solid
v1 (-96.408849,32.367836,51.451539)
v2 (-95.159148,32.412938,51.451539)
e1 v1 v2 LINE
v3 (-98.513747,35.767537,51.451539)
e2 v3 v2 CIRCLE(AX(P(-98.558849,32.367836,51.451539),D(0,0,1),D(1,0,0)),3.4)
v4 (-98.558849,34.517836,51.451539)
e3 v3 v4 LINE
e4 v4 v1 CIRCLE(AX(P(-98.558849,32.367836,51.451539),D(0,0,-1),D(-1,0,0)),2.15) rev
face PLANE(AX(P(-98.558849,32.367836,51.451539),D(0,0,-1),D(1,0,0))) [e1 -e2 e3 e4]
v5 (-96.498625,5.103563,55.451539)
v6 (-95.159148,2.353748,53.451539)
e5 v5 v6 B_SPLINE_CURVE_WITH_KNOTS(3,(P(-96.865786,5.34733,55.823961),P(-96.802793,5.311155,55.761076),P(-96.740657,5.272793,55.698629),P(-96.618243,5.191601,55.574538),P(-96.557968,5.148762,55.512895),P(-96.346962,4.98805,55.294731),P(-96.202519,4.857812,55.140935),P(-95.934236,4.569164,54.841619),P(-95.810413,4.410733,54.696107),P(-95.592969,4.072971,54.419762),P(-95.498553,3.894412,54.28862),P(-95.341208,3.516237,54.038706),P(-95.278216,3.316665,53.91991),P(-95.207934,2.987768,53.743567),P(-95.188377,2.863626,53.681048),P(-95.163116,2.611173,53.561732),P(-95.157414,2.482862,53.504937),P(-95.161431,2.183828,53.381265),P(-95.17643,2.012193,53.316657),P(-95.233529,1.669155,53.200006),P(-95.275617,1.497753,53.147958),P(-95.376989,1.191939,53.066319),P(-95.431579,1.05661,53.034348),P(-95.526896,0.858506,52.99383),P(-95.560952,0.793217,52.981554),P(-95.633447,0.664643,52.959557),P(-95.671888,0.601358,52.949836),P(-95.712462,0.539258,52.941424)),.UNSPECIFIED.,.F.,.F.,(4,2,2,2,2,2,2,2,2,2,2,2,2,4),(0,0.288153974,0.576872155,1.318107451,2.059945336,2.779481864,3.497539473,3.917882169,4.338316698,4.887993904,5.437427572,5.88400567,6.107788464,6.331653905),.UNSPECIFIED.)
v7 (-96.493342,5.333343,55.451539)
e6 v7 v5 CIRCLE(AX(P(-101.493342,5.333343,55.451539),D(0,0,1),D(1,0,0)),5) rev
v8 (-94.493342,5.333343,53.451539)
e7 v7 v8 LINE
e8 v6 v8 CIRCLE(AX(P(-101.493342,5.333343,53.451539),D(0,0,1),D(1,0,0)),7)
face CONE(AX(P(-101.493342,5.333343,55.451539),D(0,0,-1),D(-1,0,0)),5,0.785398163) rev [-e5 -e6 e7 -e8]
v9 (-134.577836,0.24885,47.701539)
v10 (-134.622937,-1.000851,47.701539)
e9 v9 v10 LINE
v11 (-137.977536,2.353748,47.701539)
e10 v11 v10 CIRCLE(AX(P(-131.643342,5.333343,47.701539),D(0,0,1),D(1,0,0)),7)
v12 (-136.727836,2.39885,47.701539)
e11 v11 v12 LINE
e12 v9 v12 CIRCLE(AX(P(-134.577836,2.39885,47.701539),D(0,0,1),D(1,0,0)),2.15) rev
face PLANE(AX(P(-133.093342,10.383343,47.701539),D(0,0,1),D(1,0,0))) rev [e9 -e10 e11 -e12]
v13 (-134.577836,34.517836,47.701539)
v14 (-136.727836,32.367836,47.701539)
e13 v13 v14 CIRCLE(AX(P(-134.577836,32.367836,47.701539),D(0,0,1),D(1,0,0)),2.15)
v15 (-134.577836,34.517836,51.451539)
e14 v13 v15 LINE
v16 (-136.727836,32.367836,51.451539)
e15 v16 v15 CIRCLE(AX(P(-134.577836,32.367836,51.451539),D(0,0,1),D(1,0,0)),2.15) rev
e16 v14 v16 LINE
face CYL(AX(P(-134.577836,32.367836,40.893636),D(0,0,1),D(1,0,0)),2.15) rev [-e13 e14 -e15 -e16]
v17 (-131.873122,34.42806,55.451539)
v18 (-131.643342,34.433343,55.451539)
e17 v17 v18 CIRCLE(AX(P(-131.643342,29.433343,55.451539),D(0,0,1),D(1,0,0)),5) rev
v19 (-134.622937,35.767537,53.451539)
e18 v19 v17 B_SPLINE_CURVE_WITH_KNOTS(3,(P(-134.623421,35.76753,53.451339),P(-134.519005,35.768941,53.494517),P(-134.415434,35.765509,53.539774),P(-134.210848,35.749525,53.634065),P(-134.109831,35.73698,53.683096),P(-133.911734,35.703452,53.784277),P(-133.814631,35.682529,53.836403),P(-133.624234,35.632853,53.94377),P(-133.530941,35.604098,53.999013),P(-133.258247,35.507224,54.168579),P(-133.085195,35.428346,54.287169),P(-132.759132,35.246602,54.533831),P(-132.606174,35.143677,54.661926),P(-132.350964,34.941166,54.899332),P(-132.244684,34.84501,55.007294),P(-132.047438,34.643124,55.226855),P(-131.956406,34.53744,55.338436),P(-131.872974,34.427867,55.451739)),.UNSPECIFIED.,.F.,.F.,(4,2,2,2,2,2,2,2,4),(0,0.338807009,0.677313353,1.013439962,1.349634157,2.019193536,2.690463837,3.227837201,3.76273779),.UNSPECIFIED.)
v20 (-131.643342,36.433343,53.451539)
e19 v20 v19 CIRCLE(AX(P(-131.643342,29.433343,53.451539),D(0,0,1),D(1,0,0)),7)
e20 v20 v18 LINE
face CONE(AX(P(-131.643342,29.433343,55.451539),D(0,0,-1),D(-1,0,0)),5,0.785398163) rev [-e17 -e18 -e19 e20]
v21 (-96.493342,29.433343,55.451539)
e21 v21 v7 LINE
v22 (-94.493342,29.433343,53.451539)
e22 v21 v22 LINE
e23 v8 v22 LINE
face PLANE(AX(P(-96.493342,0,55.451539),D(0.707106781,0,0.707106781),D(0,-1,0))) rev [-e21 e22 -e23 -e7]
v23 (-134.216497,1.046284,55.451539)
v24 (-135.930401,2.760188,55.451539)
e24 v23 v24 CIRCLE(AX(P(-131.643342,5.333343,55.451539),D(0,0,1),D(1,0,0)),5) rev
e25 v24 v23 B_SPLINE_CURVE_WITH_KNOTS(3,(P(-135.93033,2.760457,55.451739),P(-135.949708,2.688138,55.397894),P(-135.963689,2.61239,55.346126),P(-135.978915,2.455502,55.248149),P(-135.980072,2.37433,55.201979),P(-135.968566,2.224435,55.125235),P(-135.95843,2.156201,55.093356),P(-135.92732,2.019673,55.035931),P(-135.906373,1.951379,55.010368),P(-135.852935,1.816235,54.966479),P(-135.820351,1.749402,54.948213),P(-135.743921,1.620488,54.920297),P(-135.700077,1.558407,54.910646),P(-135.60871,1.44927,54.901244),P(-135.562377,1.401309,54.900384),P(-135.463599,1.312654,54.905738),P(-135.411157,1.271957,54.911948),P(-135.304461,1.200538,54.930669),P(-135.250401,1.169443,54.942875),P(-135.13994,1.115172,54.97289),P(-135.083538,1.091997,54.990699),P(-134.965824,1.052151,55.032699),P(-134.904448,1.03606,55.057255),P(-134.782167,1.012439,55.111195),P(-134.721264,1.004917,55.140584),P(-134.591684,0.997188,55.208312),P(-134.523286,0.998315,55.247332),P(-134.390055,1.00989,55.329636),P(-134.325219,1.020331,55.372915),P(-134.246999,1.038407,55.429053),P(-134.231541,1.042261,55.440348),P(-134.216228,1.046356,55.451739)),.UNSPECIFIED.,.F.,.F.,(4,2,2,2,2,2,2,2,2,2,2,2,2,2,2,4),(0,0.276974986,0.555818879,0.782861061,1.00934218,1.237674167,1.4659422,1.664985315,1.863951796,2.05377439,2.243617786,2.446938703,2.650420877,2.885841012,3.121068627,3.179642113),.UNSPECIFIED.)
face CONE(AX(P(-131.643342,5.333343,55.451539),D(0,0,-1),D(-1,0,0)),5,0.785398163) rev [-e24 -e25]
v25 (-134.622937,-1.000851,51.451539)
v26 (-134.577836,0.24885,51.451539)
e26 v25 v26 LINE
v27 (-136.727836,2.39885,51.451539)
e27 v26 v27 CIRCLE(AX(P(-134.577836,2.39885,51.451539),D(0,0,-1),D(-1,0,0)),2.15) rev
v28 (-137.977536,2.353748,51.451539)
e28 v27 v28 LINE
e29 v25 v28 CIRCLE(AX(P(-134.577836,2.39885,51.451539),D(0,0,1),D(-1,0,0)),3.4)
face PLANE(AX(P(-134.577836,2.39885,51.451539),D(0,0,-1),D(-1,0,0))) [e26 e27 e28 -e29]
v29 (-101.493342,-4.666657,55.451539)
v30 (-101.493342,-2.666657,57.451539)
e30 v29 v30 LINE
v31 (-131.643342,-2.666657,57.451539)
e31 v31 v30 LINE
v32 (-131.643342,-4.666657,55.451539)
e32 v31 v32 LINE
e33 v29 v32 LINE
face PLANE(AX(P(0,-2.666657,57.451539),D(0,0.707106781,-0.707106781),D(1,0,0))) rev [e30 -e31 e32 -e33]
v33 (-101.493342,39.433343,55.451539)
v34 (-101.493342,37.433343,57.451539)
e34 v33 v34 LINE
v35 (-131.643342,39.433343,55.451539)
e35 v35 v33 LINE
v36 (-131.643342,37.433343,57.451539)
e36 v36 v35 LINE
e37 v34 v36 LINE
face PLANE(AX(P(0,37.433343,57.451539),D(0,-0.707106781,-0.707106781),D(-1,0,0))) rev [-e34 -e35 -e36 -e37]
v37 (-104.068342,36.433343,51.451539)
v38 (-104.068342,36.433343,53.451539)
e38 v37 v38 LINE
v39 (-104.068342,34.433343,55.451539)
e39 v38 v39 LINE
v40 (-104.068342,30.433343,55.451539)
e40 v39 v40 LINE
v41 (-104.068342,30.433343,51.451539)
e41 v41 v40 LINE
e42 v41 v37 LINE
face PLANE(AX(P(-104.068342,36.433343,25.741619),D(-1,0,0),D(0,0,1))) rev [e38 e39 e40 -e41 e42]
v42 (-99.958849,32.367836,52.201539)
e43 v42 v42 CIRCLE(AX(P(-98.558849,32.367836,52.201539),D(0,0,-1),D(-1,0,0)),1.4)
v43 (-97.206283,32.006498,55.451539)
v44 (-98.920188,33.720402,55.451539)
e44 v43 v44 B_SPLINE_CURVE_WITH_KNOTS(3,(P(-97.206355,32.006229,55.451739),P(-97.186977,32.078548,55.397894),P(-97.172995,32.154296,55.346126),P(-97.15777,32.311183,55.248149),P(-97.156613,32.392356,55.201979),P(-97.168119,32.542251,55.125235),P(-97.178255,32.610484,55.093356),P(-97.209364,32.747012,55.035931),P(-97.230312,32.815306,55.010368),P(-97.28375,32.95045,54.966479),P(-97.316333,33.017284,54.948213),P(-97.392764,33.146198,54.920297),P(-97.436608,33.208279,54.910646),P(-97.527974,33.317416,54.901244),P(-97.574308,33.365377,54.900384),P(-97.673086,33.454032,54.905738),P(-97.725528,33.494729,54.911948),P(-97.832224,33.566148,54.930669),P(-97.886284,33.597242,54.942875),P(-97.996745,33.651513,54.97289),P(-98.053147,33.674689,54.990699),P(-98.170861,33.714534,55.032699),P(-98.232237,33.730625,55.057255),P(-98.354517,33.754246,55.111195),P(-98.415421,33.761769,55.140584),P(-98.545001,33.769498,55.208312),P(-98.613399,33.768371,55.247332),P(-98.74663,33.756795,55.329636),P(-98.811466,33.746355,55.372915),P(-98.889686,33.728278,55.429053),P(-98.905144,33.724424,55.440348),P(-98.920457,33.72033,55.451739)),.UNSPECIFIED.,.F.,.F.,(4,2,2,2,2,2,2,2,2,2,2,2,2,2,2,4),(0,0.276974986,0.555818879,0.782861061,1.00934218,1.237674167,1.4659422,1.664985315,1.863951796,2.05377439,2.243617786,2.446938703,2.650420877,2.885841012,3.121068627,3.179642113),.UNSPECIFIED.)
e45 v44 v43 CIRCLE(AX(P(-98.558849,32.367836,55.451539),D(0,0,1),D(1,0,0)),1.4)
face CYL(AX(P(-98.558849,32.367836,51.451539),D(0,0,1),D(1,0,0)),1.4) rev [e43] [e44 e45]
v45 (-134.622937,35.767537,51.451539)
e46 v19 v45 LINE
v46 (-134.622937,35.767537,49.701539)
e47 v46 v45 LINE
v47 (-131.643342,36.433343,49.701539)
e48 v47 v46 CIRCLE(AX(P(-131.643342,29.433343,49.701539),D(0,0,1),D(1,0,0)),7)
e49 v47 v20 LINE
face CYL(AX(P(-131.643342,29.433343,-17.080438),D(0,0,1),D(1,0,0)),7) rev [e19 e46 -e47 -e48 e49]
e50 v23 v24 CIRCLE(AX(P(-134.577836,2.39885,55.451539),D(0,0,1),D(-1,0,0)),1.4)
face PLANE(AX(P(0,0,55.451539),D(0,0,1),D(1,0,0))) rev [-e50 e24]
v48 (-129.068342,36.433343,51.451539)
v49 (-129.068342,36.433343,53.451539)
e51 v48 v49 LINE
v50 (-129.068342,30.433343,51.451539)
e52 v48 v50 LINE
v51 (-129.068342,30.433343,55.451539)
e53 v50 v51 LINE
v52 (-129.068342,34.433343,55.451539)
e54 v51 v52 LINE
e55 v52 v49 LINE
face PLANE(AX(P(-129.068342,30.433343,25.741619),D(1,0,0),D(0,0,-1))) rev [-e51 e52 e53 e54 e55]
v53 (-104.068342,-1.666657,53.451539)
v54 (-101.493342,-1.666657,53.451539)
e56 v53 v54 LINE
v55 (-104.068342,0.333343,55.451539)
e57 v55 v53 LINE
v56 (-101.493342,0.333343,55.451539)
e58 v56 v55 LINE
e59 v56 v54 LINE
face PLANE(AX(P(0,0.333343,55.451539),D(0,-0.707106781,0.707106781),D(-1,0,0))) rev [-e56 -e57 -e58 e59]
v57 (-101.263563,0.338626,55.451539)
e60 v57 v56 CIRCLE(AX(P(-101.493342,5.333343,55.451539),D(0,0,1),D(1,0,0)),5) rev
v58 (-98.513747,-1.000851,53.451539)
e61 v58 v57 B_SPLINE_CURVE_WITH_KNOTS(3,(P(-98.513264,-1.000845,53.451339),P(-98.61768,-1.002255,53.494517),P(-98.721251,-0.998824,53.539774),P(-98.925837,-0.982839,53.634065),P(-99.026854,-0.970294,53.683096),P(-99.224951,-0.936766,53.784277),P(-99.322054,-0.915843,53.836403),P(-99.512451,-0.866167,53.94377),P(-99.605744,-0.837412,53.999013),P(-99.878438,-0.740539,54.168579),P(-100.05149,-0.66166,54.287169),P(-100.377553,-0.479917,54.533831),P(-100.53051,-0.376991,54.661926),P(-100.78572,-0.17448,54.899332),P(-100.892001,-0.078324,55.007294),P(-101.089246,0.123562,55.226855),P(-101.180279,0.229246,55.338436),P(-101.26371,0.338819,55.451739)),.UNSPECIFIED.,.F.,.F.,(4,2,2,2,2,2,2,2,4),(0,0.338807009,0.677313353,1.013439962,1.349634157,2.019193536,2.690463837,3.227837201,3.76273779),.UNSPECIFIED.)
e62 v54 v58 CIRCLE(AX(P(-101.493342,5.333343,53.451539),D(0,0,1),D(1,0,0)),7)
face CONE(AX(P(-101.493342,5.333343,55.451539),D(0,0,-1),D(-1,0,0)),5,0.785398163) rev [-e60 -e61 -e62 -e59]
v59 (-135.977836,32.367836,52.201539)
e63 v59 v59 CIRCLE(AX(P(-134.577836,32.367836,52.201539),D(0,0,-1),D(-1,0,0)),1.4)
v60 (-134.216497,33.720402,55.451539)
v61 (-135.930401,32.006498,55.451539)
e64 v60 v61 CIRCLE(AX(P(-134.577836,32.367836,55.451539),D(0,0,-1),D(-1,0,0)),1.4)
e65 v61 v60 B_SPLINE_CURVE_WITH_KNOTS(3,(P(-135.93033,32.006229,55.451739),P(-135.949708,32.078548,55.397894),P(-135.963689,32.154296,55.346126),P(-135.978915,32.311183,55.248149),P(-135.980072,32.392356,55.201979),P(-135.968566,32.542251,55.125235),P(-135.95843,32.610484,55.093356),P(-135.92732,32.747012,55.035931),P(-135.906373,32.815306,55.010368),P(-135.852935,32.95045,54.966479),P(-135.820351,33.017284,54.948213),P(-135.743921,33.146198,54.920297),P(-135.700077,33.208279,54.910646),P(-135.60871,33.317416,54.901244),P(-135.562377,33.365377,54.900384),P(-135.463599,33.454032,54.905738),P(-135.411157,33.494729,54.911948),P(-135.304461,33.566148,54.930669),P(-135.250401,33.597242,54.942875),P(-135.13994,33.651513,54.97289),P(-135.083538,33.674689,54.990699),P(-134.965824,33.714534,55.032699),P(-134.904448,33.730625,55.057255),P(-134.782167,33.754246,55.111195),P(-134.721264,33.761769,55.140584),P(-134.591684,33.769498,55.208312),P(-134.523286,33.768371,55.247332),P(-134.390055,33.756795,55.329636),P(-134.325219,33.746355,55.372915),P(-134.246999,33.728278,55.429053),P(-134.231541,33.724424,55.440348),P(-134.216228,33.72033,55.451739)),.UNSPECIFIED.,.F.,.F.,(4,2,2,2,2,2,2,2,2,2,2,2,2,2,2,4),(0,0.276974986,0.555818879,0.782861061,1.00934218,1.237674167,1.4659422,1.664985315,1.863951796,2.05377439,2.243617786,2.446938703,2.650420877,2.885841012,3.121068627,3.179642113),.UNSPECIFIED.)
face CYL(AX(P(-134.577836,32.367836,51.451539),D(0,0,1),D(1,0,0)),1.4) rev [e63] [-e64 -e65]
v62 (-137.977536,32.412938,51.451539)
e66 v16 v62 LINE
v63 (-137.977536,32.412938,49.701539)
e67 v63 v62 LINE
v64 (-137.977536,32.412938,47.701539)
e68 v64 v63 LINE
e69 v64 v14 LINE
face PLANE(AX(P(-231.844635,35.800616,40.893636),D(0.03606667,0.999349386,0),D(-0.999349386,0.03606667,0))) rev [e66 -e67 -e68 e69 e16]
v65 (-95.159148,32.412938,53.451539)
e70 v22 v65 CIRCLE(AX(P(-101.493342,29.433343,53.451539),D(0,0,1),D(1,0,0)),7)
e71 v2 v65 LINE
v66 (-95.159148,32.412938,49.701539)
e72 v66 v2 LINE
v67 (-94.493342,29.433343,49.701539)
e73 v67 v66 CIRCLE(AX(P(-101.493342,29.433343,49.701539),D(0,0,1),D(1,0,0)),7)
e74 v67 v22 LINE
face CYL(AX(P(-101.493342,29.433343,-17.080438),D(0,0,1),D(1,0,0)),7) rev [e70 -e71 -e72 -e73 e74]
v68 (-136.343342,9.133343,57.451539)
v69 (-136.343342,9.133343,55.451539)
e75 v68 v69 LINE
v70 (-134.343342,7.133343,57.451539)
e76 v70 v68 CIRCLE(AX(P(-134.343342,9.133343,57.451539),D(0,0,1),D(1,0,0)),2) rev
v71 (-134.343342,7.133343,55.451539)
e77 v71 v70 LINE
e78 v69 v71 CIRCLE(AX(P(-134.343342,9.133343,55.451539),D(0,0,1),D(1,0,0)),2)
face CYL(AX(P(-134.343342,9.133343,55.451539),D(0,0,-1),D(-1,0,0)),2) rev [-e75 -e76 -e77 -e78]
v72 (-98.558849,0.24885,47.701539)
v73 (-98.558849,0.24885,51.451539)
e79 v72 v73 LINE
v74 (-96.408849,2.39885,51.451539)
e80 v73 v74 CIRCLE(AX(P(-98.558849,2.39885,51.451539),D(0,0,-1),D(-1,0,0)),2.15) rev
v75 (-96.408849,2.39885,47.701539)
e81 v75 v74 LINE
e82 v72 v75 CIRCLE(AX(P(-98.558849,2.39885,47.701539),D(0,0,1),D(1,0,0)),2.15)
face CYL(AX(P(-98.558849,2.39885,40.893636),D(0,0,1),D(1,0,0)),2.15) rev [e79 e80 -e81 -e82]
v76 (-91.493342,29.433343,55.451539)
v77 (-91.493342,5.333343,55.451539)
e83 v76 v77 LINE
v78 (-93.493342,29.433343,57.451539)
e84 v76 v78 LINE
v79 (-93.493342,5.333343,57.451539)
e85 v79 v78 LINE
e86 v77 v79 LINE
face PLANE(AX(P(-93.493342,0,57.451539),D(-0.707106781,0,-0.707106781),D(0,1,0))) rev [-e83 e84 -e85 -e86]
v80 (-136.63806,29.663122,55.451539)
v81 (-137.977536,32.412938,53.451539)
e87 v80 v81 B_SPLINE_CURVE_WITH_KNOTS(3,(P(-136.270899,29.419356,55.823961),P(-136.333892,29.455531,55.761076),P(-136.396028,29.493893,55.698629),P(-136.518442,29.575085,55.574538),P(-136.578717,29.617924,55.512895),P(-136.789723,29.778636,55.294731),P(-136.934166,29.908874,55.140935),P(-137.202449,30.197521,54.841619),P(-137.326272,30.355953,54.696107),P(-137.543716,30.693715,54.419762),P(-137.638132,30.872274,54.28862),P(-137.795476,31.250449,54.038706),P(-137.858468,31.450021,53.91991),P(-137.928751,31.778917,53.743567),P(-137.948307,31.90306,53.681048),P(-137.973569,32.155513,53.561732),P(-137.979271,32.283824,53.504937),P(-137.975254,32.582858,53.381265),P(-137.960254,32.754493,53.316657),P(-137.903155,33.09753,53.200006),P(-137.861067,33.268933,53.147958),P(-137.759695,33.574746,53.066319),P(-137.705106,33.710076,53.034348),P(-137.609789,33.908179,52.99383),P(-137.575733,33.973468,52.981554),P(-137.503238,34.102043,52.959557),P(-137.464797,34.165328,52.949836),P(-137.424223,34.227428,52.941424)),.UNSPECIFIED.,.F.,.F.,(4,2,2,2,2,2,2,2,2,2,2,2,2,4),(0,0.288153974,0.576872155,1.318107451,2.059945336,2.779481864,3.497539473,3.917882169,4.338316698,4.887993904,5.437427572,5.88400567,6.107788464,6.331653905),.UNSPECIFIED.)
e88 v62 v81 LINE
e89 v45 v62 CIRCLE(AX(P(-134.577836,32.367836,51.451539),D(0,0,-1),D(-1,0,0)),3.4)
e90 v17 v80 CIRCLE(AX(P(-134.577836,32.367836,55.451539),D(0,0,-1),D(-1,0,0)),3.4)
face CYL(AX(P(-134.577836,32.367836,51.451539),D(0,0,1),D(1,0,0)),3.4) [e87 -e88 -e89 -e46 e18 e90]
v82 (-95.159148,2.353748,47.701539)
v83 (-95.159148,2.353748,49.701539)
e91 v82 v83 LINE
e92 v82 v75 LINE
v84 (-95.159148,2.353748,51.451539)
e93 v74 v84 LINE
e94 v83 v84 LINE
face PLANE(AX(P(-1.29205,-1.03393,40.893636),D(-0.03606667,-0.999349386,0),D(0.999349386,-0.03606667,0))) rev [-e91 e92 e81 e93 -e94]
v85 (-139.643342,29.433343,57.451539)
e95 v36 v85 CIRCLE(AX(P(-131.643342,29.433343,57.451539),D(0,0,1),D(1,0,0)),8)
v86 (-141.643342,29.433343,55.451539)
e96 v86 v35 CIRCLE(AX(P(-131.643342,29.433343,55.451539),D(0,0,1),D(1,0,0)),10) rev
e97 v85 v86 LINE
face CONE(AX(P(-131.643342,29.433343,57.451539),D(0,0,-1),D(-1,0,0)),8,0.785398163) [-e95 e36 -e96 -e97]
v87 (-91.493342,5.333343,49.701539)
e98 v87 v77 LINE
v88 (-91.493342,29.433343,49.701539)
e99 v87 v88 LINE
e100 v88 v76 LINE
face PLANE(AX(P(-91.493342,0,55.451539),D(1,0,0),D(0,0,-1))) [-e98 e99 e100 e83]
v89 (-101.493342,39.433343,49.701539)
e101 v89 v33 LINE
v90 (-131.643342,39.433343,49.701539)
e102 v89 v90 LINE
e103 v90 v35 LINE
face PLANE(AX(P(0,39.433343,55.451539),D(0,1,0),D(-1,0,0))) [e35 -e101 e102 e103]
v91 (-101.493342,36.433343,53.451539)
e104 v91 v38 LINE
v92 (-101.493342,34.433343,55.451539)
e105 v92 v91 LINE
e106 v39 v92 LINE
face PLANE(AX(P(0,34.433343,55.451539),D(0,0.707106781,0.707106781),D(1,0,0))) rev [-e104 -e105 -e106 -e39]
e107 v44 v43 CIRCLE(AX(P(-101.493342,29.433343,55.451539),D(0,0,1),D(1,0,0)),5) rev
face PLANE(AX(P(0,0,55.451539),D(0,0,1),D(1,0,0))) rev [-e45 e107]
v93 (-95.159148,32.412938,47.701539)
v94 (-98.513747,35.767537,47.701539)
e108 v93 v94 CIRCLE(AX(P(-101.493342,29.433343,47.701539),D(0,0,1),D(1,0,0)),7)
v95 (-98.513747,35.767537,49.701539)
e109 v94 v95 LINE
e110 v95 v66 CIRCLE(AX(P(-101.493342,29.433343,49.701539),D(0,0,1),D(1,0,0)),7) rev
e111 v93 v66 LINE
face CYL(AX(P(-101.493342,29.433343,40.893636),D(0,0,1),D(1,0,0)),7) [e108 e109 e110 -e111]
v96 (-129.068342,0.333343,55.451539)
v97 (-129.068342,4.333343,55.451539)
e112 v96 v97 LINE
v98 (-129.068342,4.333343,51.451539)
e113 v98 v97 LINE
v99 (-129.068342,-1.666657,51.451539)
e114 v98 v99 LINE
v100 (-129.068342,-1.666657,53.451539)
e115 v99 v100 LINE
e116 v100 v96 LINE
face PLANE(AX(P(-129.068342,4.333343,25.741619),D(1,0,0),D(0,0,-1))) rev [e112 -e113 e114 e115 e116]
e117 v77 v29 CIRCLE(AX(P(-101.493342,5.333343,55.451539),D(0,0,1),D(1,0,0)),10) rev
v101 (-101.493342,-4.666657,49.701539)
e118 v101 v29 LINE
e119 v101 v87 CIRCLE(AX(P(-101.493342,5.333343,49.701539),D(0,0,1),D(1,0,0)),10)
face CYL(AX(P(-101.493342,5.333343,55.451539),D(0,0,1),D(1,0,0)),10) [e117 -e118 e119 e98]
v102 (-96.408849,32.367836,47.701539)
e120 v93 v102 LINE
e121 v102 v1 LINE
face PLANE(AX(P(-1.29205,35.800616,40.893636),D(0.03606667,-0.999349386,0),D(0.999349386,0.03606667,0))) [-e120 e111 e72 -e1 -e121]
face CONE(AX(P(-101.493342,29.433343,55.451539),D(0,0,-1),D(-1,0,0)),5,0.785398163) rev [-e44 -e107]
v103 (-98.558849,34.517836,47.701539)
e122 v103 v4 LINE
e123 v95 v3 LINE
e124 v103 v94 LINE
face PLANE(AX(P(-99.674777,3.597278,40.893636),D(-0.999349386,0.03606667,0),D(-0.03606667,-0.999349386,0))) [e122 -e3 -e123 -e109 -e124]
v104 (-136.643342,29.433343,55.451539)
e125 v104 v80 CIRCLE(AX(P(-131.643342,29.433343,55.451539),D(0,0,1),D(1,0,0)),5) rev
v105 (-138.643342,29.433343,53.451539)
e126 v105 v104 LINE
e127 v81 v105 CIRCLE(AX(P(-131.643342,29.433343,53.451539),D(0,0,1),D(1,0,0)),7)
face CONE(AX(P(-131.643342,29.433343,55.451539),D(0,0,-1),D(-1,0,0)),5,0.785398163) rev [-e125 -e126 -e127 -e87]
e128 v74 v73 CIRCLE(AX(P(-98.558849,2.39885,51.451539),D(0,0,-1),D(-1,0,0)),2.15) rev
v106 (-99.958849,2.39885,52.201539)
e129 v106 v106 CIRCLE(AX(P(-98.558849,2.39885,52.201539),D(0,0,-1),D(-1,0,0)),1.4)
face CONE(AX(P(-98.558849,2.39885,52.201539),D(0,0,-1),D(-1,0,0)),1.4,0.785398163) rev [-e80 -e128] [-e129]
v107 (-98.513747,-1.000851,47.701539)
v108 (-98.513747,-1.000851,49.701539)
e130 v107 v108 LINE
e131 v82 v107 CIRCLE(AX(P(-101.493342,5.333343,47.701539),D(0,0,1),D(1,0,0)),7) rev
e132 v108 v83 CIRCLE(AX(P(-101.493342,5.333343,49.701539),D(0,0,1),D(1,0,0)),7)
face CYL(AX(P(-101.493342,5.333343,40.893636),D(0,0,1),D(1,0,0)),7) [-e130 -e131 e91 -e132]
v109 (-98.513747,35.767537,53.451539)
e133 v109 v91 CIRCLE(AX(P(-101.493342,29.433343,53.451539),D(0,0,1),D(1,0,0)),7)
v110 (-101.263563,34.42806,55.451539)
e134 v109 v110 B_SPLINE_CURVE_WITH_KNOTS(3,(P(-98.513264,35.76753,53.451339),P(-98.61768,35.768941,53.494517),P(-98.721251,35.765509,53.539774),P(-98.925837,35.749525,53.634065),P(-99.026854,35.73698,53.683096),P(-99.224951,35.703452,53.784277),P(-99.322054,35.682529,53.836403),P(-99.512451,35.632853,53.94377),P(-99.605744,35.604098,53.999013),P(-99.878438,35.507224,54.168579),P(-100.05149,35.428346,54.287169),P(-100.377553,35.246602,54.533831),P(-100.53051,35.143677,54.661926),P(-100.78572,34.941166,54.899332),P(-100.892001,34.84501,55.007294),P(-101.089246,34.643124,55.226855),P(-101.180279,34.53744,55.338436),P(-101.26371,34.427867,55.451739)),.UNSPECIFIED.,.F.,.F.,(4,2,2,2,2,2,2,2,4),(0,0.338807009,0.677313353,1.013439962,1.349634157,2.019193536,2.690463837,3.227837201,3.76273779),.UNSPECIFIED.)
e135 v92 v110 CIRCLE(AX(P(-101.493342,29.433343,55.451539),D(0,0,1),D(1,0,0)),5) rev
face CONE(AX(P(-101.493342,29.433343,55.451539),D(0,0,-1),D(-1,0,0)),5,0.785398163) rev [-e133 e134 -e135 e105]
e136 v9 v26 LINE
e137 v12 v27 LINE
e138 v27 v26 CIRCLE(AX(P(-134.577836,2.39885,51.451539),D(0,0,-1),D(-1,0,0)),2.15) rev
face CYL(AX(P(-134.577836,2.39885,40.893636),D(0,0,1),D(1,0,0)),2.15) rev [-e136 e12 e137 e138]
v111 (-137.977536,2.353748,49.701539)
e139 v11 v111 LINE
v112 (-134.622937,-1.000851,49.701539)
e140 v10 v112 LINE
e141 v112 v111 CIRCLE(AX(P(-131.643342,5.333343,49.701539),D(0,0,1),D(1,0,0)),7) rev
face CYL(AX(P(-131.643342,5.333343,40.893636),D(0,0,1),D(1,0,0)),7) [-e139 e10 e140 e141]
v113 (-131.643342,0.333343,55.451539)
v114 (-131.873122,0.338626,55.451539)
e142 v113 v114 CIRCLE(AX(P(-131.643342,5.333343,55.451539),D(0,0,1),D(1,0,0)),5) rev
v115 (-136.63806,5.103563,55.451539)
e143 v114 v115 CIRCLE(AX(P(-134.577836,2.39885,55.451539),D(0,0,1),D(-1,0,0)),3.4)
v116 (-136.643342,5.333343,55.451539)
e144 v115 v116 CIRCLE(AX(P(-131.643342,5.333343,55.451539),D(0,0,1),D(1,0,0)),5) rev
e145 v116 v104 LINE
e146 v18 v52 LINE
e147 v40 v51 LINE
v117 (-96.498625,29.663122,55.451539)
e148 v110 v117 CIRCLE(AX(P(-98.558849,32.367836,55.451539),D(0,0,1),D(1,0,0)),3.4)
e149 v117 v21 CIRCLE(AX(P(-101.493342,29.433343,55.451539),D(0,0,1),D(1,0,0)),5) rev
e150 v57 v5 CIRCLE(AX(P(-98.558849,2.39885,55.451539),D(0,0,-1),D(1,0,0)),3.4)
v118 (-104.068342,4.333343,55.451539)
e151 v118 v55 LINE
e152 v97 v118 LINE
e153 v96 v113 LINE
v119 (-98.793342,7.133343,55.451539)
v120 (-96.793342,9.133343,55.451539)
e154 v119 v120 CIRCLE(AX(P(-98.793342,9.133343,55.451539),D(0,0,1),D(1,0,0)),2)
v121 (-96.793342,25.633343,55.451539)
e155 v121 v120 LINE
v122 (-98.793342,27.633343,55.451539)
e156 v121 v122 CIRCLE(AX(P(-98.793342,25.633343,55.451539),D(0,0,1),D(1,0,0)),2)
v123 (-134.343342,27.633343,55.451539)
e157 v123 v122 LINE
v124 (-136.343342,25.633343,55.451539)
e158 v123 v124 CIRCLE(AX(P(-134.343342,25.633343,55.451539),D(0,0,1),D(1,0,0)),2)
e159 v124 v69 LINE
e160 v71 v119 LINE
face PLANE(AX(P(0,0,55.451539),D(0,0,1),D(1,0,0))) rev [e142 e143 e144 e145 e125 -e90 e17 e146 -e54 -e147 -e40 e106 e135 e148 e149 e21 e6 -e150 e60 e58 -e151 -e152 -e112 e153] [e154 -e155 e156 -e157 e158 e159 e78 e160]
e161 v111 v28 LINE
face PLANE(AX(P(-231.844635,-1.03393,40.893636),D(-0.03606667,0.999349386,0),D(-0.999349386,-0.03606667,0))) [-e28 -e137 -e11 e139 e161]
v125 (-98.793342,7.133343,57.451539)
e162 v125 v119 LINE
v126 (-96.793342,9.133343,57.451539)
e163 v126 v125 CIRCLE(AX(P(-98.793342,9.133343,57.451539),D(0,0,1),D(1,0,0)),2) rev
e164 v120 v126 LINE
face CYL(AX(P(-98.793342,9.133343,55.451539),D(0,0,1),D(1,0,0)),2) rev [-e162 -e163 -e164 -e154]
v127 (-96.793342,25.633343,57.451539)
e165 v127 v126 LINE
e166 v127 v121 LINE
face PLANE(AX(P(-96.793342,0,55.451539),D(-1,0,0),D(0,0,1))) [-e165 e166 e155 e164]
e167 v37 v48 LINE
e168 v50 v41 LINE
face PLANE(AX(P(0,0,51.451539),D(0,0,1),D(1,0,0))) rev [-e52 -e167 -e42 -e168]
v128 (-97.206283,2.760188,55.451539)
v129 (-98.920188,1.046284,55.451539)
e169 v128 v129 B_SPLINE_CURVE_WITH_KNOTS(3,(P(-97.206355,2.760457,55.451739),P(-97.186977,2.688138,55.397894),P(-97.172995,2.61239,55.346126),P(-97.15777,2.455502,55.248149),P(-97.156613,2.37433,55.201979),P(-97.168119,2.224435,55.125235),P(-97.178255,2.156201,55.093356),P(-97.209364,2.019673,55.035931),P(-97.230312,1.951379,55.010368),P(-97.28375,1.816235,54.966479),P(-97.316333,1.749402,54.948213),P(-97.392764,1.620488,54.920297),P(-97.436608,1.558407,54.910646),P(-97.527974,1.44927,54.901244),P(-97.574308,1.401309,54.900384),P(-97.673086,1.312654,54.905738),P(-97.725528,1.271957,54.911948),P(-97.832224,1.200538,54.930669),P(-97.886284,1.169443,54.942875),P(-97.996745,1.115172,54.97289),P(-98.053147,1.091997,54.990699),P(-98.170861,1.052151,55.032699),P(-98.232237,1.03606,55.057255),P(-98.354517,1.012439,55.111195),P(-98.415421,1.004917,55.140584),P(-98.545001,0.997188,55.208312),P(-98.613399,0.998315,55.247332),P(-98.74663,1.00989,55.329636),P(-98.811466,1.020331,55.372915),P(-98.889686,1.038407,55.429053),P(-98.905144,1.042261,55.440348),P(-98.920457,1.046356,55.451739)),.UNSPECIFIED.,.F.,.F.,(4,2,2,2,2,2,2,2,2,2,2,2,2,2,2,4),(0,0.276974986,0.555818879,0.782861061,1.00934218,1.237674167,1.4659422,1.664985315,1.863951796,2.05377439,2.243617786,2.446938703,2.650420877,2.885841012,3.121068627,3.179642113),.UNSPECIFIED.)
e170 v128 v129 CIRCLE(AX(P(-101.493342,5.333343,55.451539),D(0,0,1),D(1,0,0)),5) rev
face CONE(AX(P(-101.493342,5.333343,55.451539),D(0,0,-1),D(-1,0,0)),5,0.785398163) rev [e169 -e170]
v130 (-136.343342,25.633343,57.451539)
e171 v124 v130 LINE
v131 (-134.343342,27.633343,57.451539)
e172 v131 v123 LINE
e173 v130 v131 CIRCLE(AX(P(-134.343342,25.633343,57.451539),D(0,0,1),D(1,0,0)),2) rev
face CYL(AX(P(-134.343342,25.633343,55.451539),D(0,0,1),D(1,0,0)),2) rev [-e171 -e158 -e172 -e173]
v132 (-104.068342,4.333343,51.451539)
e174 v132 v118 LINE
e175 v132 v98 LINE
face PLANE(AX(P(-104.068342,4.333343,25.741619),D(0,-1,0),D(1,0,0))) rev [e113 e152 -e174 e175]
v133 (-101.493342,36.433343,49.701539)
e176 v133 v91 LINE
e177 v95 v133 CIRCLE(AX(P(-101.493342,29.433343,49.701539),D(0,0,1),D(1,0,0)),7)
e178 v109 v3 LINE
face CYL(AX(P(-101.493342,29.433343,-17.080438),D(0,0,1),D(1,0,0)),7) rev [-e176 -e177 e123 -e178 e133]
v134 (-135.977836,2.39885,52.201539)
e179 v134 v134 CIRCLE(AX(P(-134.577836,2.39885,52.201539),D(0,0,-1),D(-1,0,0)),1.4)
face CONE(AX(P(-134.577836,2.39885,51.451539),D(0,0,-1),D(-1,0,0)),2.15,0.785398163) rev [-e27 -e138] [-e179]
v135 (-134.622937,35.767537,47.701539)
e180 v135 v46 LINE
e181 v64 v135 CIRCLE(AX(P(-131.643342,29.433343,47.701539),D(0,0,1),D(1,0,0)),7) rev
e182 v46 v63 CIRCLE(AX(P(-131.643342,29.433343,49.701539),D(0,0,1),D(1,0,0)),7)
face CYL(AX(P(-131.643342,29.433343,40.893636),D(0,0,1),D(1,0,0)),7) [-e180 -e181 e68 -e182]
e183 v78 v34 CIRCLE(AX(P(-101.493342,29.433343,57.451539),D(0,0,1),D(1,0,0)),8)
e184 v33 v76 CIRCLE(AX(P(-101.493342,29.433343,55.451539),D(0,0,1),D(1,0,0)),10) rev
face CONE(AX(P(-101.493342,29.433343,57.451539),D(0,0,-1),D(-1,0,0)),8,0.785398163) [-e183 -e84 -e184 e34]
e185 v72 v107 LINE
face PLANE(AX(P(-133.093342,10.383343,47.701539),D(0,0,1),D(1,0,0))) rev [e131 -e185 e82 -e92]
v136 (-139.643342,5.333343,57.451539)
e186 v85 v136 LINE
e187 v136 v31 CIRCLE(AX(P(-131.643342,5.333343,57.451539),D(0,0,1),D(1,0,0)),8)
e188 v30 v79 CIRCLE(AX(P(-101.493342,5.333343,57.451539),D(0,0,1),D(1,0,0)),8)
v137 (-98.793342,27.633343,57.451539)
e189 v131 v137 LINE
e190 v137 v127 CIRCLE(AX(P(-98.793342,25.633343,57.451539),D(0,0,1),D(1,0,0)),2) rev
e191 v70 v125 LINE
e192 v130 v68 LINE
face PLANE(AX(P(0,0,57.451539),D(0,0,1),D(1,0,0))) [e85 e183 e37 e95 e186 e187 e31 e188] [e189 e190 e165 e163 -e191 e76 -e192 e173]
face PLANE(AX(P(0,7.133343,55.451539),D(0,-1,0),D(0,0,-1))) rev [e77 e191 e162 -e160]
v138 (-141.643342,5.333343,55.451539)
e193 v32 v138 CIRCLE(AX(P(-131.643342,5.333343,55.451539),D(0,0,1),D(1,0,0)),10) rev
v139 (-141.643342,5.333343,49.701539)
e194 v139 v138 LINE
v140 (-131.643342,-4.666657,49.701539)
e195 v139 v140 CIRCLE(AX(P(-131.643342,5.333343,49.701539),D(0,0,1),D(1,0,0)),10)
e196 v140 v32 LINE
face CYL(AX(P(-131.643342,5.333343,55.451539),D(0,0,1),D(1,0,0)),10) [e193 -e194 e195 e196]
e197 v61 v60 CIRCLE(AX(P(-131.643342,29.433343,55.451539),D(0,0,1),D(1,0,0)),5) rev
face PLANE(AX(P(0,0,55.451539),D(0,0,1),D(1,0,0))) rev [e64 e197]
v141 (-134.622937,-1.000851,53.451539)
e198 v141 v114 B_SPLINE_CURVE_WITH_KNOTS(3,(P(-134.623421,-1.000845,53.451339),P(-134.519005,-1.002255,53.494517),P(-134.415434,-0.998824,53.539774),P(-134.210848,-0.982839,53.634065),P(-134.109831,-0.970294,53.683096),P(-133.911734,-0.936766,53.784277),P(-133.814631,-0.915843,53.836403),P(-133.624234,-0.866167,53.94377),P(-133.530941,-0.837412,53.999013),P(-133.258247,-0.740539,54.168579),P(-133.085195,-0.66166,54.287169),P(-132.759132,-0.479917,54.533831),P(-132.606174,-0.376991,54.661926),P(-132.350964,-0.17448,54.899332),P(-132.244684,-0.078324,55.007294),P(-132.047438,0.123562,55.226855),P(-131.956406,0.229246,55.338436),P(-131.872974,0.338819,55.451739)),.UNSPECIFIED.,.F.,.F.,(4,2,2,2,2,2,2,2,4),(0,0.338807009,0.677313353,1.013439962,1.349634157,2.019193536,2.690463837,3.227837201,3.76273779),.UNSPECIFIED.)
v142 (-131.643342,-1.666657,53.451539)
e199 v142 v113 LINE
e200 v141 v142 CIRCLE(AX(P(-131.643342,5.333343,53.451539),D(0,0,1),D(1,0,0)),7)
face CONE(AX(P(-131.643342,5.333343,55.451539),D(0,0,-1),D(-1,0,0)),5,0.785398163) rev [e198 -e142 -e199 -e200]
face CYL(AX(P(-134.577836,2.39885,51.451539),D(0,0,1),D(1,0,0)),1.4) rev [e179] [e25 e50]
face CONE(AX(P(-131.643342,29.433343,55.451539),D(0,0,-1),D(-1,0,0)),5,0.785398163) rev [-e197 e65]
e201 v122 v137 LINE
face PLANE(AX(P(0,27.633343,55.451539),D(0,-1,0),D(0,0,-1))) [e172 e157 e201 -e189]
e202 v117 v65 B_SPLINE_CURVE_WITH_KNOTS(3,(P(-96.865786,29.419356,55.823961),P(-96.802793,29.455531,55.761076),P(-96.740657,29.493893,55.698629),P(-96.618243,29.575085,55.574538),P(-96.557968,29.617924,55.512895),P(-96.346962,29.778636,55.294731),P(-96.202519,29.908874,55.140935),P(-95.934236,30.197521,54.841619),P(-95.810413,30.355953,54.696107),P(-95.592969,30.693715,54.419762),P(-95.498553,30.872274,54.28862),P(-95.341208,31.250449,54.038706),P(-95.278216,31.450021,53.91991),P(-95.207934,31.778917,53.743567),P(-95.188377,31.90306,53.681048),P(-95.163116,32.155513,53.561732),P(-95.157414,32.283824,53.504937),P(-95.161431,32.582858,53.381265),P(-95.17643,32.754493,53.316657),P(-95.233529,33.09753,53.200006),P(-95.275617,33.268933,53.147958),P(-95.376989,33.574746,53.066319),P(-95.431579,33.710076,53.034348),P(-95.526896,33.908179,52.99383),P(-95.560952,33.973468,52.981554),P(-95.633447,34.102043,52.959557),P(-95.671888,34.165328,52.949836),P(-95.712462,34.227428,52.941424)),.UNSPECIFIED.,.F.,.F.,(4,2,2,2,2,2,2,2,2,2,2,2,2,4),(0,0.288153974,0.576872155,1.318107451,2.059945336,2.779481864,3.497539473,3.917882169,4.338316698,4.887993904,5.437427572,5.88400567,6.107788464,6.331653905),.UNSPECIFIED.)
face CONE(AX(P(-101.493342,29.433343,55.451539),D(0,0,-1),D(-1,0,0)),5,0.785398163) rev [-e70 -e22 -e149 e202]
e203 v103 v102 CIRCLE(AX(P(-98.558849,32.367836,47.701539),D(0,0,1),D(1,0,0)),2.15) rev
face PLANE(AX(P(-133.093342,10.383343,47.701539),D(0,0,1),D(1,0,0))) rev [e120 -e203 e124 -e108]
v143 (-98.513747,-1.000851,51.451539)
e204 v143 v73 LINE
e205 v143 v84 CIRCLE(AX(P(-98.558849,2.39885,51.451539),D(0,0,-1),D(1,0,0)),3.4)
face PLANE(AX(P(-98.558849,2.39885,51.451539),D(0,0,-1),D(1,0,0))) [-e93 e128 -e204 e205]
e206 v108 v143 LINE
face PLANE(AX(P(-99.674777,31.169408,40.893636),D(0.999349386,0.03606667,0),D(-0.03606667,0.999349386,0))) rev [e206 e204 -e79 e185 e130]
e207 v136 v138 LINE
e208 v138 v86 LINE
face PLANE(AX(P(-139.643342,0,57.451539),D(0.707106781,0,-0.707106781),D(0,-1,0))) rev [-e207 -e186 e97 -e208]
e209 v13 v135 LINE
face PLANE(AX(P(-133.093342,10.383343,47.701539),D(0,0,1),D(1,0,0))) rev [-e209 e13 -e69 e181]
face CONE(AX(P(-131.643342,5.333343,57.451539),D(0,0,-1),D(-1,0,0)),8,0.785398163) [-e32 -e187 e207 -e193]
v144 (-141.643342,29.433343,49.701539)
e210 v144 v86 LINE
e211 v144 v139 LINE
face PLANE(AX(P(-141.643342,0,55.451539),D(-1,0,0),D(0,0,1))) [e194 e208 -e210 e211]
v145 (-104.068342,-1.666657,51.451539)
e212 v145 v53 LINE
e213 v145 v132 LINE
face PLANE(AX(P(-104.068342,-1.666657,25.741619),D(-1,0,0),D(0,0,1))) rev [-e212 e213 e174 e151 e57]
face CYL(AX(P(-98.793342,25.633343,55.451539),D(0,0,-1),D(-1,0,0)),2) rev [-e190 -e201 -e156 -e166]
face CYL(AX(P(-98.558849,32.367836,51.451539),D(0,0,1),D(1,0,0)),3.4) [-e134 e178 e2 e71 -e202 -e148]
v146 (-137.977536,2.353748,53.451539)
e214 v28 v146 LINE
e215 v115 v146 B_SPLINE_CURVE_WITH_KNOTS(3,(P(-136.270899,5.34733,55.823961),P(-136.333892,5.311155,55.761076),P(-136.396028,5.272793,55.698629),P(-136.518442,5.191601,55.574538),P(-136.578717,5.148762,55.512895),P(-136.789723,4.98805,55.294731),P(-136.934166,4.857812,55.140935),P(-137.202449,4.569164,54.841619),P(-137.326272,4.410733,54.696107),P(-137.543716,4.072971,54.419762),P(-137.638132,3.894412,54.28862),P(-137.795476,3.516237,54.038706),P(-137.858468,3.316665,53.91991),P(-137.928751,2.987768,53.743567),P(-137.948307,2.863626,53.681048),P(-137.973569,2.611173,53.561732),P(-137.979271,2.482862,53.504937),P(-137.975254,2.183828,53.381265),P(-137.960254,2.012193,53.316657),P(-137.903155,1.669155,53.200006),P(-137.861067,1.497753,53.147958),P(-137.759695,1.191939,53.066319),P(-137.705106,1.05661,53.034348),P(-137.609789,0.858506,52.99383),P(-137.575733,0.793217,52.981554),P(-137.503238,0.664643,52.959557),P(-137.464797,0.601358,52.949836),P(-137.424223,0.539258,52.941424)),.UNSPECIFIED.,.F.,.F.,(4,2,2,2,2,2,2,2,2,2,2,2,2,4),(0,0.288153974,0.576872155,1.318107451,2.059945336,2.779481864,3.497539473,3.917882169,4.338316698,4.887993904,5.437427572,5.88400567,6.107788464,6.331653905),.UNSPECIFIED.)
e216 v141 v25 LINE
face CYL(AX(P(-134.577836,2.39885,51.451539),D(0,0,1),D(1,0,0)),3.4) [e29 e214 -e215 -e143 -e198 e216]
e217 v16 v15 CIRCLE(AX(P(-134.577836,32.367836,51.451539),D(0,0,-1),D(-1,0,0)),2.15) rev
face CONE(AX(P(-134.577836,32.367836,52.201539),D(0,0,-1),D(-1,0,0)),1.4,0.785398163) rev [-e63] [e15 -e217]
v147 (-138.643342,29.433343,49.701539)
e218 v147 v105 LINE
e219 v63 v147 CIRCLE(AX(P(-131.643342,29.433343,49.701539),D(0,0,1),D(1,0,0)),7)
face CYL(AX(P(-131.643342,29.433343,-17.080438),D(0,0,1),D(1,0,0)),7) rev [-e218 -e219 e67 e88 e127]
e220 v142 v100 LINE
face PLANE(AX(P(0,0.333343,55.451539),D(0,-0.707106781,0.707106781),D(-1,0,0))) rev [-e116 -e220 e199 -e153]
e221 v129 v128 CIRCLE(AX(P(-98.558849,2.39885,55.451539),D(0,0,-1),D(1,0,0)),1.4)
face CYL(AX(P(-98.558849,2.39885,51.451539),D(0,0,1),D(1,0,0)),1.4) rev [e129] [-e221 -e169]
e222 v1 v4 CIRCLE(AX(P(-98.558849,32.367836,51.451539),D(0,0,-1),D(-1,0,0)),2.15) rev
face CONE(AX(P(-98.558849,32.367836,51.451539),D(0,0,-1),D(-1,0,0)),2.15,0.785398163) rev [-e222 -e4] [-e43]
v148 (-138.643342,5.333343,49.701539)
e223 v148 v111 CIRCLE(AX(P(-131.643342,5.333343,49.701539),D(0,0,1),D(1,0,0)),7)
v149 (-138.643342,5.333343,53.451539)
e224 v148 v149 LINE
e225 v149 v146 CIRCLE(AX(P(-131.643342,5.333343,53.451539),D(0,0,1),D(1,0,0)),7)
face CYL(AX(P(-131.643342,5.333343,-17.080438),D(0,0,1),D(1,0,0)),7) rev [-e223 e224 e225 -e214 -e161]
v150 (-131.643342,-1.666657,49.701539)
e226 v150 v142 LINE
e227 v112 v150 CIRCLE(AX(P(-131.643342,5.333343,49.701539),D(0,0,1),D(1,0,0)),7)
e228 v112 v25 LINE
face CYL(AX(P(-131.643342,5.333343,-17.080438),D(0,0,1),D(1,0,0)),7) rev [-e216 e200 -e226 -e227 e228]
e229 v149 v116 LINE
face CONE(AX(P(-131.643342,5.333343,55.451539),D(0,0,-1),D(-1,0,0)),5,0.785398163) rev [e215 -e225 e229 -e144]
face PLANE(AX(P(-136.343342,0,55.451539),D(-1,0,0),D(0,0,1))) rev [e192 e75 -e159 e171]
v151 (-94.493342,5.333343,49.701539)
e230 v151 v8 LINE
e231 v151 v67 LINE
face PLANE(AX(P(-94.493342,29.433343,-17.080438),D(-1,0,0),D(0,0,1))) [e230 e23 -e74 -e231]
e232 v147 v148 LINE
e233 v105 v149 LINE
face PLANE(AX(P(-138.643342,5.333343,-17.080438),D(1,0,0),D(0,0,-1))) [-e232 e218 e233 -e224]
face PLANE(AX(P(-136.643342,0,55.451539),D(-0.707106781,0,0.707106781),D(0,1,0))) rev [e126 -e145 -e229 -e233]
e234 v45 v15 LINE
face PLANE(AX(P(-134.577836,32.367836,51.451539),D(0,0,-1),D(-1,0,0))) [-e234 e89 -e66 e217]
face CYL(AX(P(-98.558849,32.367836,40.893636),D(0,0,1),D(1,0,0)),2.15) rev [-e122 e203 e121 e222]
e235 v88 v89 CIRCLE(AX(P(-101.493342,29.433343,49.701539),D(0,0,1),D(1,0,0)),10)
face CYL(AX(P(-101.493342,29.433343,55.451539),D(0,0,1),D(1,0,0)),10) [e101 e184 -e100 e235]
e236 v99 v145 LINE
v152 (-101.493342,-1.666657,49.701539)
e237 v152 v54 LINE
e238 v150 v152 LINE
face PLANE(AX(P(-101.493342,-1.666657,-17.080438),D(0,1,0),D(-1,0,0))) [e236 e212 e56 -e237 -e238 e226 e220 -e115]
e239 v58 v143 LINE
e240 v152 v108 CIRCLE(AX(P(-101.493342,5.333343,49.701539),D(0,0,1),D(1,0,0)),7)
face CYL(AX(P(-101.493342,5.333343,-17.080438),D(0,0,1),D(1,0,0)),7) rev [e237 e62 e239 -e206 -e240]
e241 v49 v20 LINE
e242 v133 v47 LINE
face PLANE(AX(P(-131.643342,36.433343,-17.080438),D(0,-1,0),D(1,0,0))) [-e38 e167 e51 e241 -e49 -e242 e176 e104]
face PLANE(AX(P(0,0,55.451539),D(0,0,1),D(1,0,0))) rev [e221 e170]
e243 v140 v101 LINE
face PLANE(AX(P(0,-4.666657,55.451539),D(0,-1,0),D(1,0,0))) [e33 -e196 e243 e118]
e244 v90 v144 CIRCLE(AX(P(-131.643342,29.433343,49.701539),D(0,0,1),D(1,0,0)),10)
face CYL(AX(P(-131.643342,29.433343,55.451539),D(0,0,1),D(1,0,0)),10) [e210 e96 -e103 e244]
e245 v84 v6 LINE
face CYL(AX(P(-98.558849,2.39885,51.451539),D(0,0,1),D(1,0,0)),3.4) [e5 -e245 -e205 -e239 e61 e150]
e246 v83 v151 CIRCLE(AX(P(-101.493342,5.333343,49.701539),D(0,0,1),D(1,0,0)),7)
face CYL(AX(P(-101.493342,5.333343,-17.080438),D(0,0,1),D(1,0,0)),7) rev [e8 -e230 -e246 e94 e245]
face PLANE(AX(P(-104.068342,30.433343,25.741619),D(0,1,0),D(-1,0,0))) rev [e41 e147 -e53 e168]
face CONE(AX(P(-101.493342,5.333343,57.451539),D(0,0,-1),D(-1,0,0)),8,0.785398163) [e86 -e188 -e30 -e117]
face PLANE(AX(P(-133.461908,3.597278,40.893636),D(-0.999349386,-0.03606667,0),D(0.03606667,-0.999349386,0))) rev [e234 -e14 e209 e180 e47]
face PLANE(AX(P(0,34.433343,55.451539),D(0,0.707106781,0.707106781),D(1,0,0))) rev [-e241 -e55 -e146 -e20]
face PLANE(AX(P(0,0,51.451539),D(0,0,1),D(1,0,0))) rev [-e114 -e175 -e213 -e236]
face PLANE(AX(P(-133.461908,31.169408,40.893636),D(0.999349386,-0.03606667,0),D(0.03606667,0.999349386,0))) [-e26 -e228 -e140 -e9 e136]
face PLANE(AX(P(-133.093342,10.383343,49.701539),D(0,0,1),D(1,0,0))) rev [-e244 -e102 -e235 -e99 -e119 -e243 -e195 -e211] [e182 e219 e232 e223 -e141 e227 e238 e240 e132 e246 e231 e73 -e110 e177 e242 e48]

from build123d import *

# Parameters (mm, degrees)
SKETCH1_W                = 39.55
SKETCH1_H                = 20.5
BOSS_EXTRUDE1_DEPTH      = 2
BOSS_EXTRUDE2_DEPTH      = 5.75
SKETCH3_W                = 25
SKETCH3_H                = 6
BOSS_EXTRUDE3_DEPTH      = 4
FILLET1_R                = 2
CHAMFER1_SIZE            = 2
CHAMFER2_SIZE            = 2
SKETCH4_R                = 3.4
SKETCH4_R_2              = 1.4
BOSS_EXTRUDE4_DEPTH      = 4
CHAMFER3_SIZE            = 0.75
CHAMFER3_OF_MIRROR1_SIZE = 0.75
BOSS_EXTRUDE6_DEPTH      = 3.75
MIRROR4_COPY_1_DEPTH     = 3.75


# Read off the part's stored shape, not the designer's step: Mirror2
with BuildPart() as part:
    # Sketch1 → Boss-Extrude1 (new body)
    with BuildSketch(Plane.XY.offset(57.451538964)):
        with BuildLine():
            Line((-141.643342382, 29.433342856), (-141.643342382, 5.333342856))
            ThreePointArc((-141.643342382, 5.333342856), (-138.714410194, -1.737724956), (-131.643342382, -4.666657144))
            Line((-131.643342382, -4.666657144), (-101.493342382, -4.666657144))
            ThreePointArc((-101.493342382, -4.666657144), (-94.42227457, -1.737724956), (-91.493342382, 5.333342856))
            Line((-91.493342382, 5.333342856), (-91.493342382, 29.433342856))
            ThreePointArc((-91.493342382, 29.433342856), (-94.42227457, 36.504410668), (-101.493342382, 39.433342856))
            Line((-101.493342382, 39.433342856), (-131.643342382, 39.433342856))
            ThreePointArc((-131.643342382, 39.433342856), (-138.714410194, 36.504410668), (-141.643342382, 29.433342856))
        make_face()
        with Locations((-116.568342382, 17.383342856)):
            Rectangle(SKETCH1_W, SKETCH1_H, mode=Mode.SUBTRACT)
    extrude(amount=-BOSS_EXTRUDE1_DEPTH)

    # Sketch2 → Boss-Extrude2 (add)
    with BuildSketch(Plane(origin=(0, 0, 55.451538964), x_dir=(-1, 0, 0), z_dir=(0, 0, -1))):
        with BuildLine():
            Line((141.643342382, 5.333342856), (141.643342382, 29.433342856))
            ThreePointArc((141.643342382, 29.433342856), (138.714410194, 36.504410668), (131.643342382, 39.433342856))
            Line((131.643342382, 39.433342856), (101.493342382, 39.433342856))
            ThreePointArc((101.493342382, 39.433342856), (94.42227457, 36.504410668), (91.493342382, 29.433342856))
            Line((91.493342382, 29.433342856), (91.493342382, 5.333342856))
            ThreePointArc((91.493342382, 5.333342856), (94.42227457, -1.737724956), (101.493342382, -4.666657144))
            Line((101.493342382, -4.666657144), (131.643342382, -4.666657144))
            ThreePointArc((131.643342382, -4.666657144), (138.714410194, -1.737724956), (141.643342382, 5.333342856))
        make_face()
        with BuildLine():
            Line((138.643342382, 5.333342856), (138.643342382, 29.433342856))
            ThreePointArc((138.643342382, 29.433342856), (136.59308985, 34.383090325), (131.643342382, 36.433342856))
            Line((131.643342382, 36.433342856), (101.493342382, 36.433342856))
            ThreePointArc((101.493342382, 36.433342856), (96.543594913, 34.383090325), (94.493342382, 29.433342856))
            Line((94.493342382, 29.433342856), (94.493342382, 5.333342856))
            ThreePointArc((94.493342382, 5.333342856), (96.543594913, 0.383595388), (101.493342382, -1.666657144))
            Line((101.493342382, -1.666657144), (131.643342382, -1.666657144))
            ThreePointArc((131.643342382, -1.666657144), (136.59308985, 0.383595388), (138.643342382, 5.333342856))
        make_face(mode=Mode.SUBTRACT)
    extrude(amount=BOSS_EXTRUDE2_DEPTH)

    # Sketch3 → Boss-Extrude3 (add)
    with BuildSketch(Plane(origin=(0, 0, 55.451538964), x_dir=(-1, 0, 0), z_dir=(0, 0, -1))):
        with Locations((116.568342382, 33.433342856)):
            Rectangle(SKETCH3_W, SKETCH3_H)
        with Locations((116.568342382, 1.333342856)):
            Rectangle(SKETCH3_W, SKETCH3_H)
    extrude(amount=BOSS_EXTRUDE3_DEPTH)

    # Fillet1
    fillet1_edges = [part.edges().sort_by_distance(p)[0] for p in [
        (-136.343342382, 27.633342856, 56.451538964),
        (-136.343342382, 7.133342856, 56.451538964),
        (-96.793342382, 7.133342856, 56.451538964),
        (-96.793342382, 27.633342856, 56.451538964),
    ]]
    fillet(fillet1_edges, radius=FILLET1_R)

    # Chamfer1
    chamfer1_edges = [part.edges().sort_by_distance(p)[0] for p in [
        (-138.714410194, 36.504410668, 57.451538964),
        (-116.568342382, 39.433342856, 57.451538964),
        (-94.42227457, 36.504410668, 57.451538964),
        (-91.493342382, 17.383342856, 57.451538964),
        (-94.42227457, -1.737724956, 57.451538964),
        (-116.568342382, -4.666657144, 57.451538964),
        (-138.714410194, -1.737724956, 57.451538964),
        (-141.643342382, 17.383342856, 57.451538964),
    ]]
    chamfer(chamfer1_edges, length=CHAMFER1_SIZE)

    # Chamfer2
    chamfer2_edges = [part.edges().sort_by_distance(p)[0] for p in [
        (-136.59308985, 0.383595388, 55.451538964),
        (-138.643342382, 17.383342856, 55.451538964),
        (-136.59308985, 34.383090325, 55.451538964),
        (-130.355842382, 36.433342856, 55.451538964),
        (-96.543594913, 34.383090325, 55.451538964),
        (-94.493342382, 17.383342856, 55.451538964),
        (-96.543594913, 0.383595388, 55.451538964),
        (-102.780842382, -1.666657144, 55.451538964),
        (-102.780842382, 36.433342856, 55.451538964),
        (-130.355842382, -1.666657144, 55.451538964),
    ]]
    chamfer(chamfer2_edges, length=CHAMFER2_SIZE)

    # Sketch4 → Boss-Extrude4 (add)
    with BuildSketch(Plane(origin=(0, 0, 55.451538964), x_dir=(-1, 0, 0), z_dir=(0, 0, -1))):
        with Locations((134.577835524, 32.367835998)):
            Circle(SKETCH4_R)
        with Locations(Location((134.577835524, 32.367835998, 0), (0, 0, 104.95728905))):
            Circle(SKETCH4_R_2, mode=Mode.SUBTRACT)
    boss_extrude4 = extrude(amount=BOSS_EXTRUDE4_DEPTH)

    # Chamfer3
    chamfer3_edges = [part.edges().sort_by_distance(p)[0] for p in [
        (-134.939174021, 31.015270107, 51.451538964),
    ]]
    chamfer(chamfer3_edges, length=CHAMFER3_SIZE)

    # Mirror1: Boss-Extrude4 across plane
    add(boss_extrude4.mirror(Plane(origin=(-116.568342382, 0, 0), x_dir=(0, 0, 1), z_dir=(1, 0, 0))))

    # Chamfer3 of Mirror1
    chamfer3_of_mirror1_edges = [part.edges().sort_by_distance(p)[0] for p in [
        (-98.197510742, 31.015270107, 51.451538964),
    ]]
    chamfer(chamfer3_of_mirror1_edges, length=CHAMFER3_OF_MIRROR1_SIZE)

    # Mirror2 outline → Mirror2 (revolve)
    with BuildSketch(Plane(origin=(-98.55884924, 2.398849714, 0), x_dir=(1, 0, 0), z_dir=(0, -1, 0))):
        Polygon((1.4, 52.201538964), (2.15, 51.451538964), (3.4, 51.451538964), (3.4, 55.451538967), (1.4, 55.451538967), align=None)
    revolve(axis=Axis((-98.55884924, 2.398849714, 0), (0, 0, 1)))

    # Mirror2 2 outline → Mirror2 2 (revolve)
    with BuildSketch(Plane(origin=(-134.577835524, 2.398849714, 0), x_dir=(1, 0, 0), z_dir=(0, -1, 0))):
        Polygon((1.4, 52.201538964), (2.15, 51.451538964), (3.4, 51.451538964), (3.4, 55.451538967), (1.4, 55.451538967), align=None)
    revolve(axis=Axis((-134.577835524, 2.398849714, 0), (0, 0, 1)))

    # Sketch5 → Boss-Extrude6 (add)
    with BuildSketch(Plane(origin=(0, 0, 51.451538964), x_dir=(-1, 0, 0), z_dir=(0, 0, -1))):
        with BuildLine():
            Line((98.55884924, 34.517835998), (98.513747348, 35.767536841))
            ThreePointArc((98.513747348, 35.767536841), (96.543594913, 34.383090325), (95.159148397, 32.41293789))
            Line((95.159148397, 32.41293789), (96.40884924, 32.367835998))
            ThreePointArc((96.40884924, 32.367835998), (97.03856966, 33.888115578), (98.55884924, 34.517835998))
        make_face()
    boss_extrude6 = extrude(amount=BOSS_EXTRUDE6_DEPTH)

    # Mirror3: Boss-Extrude6 across plane
    add(boss_extrude6.mirror(Plane(origin=(-116.568342382, 0, 0), x_dir=(0, 0, 1), z_dir=(1, 0, 0))))

    # Mirror4: Boss-Extrude6 across plane
    add(boss_extrude6.mirror(Plane.ZX.offset(17.383342856)))

    # Mirror4 copy 1 sketch → Mirror4 copy 1 (add)
    with BuildSketch(Plane(origin=(-233.136684763, 34.766685713, 51.451538964), x_dir=(1, 0, 0), z_dir=(0, 0, -1))):
        with BuildLine():
            Line((98.55884924, 34.517835998), (98.513747348, 35.767536841))
            ThreePointArc((98.513747348, 35.767536841), (96.543594913, 34.383090325), (95.159148397, 32.41293789))
            Line((95.159148397, 32.41293789), (96.40884924, 32.367835998))
            ThreePointArc((96.40884924, 32.367835998), (97.03856966, 33.888115578), (98.55884924, 34.517835998))
        make_face()
    extrude(amount=MIRROR4_COPY_1_DEPTH)


solid = part.part
